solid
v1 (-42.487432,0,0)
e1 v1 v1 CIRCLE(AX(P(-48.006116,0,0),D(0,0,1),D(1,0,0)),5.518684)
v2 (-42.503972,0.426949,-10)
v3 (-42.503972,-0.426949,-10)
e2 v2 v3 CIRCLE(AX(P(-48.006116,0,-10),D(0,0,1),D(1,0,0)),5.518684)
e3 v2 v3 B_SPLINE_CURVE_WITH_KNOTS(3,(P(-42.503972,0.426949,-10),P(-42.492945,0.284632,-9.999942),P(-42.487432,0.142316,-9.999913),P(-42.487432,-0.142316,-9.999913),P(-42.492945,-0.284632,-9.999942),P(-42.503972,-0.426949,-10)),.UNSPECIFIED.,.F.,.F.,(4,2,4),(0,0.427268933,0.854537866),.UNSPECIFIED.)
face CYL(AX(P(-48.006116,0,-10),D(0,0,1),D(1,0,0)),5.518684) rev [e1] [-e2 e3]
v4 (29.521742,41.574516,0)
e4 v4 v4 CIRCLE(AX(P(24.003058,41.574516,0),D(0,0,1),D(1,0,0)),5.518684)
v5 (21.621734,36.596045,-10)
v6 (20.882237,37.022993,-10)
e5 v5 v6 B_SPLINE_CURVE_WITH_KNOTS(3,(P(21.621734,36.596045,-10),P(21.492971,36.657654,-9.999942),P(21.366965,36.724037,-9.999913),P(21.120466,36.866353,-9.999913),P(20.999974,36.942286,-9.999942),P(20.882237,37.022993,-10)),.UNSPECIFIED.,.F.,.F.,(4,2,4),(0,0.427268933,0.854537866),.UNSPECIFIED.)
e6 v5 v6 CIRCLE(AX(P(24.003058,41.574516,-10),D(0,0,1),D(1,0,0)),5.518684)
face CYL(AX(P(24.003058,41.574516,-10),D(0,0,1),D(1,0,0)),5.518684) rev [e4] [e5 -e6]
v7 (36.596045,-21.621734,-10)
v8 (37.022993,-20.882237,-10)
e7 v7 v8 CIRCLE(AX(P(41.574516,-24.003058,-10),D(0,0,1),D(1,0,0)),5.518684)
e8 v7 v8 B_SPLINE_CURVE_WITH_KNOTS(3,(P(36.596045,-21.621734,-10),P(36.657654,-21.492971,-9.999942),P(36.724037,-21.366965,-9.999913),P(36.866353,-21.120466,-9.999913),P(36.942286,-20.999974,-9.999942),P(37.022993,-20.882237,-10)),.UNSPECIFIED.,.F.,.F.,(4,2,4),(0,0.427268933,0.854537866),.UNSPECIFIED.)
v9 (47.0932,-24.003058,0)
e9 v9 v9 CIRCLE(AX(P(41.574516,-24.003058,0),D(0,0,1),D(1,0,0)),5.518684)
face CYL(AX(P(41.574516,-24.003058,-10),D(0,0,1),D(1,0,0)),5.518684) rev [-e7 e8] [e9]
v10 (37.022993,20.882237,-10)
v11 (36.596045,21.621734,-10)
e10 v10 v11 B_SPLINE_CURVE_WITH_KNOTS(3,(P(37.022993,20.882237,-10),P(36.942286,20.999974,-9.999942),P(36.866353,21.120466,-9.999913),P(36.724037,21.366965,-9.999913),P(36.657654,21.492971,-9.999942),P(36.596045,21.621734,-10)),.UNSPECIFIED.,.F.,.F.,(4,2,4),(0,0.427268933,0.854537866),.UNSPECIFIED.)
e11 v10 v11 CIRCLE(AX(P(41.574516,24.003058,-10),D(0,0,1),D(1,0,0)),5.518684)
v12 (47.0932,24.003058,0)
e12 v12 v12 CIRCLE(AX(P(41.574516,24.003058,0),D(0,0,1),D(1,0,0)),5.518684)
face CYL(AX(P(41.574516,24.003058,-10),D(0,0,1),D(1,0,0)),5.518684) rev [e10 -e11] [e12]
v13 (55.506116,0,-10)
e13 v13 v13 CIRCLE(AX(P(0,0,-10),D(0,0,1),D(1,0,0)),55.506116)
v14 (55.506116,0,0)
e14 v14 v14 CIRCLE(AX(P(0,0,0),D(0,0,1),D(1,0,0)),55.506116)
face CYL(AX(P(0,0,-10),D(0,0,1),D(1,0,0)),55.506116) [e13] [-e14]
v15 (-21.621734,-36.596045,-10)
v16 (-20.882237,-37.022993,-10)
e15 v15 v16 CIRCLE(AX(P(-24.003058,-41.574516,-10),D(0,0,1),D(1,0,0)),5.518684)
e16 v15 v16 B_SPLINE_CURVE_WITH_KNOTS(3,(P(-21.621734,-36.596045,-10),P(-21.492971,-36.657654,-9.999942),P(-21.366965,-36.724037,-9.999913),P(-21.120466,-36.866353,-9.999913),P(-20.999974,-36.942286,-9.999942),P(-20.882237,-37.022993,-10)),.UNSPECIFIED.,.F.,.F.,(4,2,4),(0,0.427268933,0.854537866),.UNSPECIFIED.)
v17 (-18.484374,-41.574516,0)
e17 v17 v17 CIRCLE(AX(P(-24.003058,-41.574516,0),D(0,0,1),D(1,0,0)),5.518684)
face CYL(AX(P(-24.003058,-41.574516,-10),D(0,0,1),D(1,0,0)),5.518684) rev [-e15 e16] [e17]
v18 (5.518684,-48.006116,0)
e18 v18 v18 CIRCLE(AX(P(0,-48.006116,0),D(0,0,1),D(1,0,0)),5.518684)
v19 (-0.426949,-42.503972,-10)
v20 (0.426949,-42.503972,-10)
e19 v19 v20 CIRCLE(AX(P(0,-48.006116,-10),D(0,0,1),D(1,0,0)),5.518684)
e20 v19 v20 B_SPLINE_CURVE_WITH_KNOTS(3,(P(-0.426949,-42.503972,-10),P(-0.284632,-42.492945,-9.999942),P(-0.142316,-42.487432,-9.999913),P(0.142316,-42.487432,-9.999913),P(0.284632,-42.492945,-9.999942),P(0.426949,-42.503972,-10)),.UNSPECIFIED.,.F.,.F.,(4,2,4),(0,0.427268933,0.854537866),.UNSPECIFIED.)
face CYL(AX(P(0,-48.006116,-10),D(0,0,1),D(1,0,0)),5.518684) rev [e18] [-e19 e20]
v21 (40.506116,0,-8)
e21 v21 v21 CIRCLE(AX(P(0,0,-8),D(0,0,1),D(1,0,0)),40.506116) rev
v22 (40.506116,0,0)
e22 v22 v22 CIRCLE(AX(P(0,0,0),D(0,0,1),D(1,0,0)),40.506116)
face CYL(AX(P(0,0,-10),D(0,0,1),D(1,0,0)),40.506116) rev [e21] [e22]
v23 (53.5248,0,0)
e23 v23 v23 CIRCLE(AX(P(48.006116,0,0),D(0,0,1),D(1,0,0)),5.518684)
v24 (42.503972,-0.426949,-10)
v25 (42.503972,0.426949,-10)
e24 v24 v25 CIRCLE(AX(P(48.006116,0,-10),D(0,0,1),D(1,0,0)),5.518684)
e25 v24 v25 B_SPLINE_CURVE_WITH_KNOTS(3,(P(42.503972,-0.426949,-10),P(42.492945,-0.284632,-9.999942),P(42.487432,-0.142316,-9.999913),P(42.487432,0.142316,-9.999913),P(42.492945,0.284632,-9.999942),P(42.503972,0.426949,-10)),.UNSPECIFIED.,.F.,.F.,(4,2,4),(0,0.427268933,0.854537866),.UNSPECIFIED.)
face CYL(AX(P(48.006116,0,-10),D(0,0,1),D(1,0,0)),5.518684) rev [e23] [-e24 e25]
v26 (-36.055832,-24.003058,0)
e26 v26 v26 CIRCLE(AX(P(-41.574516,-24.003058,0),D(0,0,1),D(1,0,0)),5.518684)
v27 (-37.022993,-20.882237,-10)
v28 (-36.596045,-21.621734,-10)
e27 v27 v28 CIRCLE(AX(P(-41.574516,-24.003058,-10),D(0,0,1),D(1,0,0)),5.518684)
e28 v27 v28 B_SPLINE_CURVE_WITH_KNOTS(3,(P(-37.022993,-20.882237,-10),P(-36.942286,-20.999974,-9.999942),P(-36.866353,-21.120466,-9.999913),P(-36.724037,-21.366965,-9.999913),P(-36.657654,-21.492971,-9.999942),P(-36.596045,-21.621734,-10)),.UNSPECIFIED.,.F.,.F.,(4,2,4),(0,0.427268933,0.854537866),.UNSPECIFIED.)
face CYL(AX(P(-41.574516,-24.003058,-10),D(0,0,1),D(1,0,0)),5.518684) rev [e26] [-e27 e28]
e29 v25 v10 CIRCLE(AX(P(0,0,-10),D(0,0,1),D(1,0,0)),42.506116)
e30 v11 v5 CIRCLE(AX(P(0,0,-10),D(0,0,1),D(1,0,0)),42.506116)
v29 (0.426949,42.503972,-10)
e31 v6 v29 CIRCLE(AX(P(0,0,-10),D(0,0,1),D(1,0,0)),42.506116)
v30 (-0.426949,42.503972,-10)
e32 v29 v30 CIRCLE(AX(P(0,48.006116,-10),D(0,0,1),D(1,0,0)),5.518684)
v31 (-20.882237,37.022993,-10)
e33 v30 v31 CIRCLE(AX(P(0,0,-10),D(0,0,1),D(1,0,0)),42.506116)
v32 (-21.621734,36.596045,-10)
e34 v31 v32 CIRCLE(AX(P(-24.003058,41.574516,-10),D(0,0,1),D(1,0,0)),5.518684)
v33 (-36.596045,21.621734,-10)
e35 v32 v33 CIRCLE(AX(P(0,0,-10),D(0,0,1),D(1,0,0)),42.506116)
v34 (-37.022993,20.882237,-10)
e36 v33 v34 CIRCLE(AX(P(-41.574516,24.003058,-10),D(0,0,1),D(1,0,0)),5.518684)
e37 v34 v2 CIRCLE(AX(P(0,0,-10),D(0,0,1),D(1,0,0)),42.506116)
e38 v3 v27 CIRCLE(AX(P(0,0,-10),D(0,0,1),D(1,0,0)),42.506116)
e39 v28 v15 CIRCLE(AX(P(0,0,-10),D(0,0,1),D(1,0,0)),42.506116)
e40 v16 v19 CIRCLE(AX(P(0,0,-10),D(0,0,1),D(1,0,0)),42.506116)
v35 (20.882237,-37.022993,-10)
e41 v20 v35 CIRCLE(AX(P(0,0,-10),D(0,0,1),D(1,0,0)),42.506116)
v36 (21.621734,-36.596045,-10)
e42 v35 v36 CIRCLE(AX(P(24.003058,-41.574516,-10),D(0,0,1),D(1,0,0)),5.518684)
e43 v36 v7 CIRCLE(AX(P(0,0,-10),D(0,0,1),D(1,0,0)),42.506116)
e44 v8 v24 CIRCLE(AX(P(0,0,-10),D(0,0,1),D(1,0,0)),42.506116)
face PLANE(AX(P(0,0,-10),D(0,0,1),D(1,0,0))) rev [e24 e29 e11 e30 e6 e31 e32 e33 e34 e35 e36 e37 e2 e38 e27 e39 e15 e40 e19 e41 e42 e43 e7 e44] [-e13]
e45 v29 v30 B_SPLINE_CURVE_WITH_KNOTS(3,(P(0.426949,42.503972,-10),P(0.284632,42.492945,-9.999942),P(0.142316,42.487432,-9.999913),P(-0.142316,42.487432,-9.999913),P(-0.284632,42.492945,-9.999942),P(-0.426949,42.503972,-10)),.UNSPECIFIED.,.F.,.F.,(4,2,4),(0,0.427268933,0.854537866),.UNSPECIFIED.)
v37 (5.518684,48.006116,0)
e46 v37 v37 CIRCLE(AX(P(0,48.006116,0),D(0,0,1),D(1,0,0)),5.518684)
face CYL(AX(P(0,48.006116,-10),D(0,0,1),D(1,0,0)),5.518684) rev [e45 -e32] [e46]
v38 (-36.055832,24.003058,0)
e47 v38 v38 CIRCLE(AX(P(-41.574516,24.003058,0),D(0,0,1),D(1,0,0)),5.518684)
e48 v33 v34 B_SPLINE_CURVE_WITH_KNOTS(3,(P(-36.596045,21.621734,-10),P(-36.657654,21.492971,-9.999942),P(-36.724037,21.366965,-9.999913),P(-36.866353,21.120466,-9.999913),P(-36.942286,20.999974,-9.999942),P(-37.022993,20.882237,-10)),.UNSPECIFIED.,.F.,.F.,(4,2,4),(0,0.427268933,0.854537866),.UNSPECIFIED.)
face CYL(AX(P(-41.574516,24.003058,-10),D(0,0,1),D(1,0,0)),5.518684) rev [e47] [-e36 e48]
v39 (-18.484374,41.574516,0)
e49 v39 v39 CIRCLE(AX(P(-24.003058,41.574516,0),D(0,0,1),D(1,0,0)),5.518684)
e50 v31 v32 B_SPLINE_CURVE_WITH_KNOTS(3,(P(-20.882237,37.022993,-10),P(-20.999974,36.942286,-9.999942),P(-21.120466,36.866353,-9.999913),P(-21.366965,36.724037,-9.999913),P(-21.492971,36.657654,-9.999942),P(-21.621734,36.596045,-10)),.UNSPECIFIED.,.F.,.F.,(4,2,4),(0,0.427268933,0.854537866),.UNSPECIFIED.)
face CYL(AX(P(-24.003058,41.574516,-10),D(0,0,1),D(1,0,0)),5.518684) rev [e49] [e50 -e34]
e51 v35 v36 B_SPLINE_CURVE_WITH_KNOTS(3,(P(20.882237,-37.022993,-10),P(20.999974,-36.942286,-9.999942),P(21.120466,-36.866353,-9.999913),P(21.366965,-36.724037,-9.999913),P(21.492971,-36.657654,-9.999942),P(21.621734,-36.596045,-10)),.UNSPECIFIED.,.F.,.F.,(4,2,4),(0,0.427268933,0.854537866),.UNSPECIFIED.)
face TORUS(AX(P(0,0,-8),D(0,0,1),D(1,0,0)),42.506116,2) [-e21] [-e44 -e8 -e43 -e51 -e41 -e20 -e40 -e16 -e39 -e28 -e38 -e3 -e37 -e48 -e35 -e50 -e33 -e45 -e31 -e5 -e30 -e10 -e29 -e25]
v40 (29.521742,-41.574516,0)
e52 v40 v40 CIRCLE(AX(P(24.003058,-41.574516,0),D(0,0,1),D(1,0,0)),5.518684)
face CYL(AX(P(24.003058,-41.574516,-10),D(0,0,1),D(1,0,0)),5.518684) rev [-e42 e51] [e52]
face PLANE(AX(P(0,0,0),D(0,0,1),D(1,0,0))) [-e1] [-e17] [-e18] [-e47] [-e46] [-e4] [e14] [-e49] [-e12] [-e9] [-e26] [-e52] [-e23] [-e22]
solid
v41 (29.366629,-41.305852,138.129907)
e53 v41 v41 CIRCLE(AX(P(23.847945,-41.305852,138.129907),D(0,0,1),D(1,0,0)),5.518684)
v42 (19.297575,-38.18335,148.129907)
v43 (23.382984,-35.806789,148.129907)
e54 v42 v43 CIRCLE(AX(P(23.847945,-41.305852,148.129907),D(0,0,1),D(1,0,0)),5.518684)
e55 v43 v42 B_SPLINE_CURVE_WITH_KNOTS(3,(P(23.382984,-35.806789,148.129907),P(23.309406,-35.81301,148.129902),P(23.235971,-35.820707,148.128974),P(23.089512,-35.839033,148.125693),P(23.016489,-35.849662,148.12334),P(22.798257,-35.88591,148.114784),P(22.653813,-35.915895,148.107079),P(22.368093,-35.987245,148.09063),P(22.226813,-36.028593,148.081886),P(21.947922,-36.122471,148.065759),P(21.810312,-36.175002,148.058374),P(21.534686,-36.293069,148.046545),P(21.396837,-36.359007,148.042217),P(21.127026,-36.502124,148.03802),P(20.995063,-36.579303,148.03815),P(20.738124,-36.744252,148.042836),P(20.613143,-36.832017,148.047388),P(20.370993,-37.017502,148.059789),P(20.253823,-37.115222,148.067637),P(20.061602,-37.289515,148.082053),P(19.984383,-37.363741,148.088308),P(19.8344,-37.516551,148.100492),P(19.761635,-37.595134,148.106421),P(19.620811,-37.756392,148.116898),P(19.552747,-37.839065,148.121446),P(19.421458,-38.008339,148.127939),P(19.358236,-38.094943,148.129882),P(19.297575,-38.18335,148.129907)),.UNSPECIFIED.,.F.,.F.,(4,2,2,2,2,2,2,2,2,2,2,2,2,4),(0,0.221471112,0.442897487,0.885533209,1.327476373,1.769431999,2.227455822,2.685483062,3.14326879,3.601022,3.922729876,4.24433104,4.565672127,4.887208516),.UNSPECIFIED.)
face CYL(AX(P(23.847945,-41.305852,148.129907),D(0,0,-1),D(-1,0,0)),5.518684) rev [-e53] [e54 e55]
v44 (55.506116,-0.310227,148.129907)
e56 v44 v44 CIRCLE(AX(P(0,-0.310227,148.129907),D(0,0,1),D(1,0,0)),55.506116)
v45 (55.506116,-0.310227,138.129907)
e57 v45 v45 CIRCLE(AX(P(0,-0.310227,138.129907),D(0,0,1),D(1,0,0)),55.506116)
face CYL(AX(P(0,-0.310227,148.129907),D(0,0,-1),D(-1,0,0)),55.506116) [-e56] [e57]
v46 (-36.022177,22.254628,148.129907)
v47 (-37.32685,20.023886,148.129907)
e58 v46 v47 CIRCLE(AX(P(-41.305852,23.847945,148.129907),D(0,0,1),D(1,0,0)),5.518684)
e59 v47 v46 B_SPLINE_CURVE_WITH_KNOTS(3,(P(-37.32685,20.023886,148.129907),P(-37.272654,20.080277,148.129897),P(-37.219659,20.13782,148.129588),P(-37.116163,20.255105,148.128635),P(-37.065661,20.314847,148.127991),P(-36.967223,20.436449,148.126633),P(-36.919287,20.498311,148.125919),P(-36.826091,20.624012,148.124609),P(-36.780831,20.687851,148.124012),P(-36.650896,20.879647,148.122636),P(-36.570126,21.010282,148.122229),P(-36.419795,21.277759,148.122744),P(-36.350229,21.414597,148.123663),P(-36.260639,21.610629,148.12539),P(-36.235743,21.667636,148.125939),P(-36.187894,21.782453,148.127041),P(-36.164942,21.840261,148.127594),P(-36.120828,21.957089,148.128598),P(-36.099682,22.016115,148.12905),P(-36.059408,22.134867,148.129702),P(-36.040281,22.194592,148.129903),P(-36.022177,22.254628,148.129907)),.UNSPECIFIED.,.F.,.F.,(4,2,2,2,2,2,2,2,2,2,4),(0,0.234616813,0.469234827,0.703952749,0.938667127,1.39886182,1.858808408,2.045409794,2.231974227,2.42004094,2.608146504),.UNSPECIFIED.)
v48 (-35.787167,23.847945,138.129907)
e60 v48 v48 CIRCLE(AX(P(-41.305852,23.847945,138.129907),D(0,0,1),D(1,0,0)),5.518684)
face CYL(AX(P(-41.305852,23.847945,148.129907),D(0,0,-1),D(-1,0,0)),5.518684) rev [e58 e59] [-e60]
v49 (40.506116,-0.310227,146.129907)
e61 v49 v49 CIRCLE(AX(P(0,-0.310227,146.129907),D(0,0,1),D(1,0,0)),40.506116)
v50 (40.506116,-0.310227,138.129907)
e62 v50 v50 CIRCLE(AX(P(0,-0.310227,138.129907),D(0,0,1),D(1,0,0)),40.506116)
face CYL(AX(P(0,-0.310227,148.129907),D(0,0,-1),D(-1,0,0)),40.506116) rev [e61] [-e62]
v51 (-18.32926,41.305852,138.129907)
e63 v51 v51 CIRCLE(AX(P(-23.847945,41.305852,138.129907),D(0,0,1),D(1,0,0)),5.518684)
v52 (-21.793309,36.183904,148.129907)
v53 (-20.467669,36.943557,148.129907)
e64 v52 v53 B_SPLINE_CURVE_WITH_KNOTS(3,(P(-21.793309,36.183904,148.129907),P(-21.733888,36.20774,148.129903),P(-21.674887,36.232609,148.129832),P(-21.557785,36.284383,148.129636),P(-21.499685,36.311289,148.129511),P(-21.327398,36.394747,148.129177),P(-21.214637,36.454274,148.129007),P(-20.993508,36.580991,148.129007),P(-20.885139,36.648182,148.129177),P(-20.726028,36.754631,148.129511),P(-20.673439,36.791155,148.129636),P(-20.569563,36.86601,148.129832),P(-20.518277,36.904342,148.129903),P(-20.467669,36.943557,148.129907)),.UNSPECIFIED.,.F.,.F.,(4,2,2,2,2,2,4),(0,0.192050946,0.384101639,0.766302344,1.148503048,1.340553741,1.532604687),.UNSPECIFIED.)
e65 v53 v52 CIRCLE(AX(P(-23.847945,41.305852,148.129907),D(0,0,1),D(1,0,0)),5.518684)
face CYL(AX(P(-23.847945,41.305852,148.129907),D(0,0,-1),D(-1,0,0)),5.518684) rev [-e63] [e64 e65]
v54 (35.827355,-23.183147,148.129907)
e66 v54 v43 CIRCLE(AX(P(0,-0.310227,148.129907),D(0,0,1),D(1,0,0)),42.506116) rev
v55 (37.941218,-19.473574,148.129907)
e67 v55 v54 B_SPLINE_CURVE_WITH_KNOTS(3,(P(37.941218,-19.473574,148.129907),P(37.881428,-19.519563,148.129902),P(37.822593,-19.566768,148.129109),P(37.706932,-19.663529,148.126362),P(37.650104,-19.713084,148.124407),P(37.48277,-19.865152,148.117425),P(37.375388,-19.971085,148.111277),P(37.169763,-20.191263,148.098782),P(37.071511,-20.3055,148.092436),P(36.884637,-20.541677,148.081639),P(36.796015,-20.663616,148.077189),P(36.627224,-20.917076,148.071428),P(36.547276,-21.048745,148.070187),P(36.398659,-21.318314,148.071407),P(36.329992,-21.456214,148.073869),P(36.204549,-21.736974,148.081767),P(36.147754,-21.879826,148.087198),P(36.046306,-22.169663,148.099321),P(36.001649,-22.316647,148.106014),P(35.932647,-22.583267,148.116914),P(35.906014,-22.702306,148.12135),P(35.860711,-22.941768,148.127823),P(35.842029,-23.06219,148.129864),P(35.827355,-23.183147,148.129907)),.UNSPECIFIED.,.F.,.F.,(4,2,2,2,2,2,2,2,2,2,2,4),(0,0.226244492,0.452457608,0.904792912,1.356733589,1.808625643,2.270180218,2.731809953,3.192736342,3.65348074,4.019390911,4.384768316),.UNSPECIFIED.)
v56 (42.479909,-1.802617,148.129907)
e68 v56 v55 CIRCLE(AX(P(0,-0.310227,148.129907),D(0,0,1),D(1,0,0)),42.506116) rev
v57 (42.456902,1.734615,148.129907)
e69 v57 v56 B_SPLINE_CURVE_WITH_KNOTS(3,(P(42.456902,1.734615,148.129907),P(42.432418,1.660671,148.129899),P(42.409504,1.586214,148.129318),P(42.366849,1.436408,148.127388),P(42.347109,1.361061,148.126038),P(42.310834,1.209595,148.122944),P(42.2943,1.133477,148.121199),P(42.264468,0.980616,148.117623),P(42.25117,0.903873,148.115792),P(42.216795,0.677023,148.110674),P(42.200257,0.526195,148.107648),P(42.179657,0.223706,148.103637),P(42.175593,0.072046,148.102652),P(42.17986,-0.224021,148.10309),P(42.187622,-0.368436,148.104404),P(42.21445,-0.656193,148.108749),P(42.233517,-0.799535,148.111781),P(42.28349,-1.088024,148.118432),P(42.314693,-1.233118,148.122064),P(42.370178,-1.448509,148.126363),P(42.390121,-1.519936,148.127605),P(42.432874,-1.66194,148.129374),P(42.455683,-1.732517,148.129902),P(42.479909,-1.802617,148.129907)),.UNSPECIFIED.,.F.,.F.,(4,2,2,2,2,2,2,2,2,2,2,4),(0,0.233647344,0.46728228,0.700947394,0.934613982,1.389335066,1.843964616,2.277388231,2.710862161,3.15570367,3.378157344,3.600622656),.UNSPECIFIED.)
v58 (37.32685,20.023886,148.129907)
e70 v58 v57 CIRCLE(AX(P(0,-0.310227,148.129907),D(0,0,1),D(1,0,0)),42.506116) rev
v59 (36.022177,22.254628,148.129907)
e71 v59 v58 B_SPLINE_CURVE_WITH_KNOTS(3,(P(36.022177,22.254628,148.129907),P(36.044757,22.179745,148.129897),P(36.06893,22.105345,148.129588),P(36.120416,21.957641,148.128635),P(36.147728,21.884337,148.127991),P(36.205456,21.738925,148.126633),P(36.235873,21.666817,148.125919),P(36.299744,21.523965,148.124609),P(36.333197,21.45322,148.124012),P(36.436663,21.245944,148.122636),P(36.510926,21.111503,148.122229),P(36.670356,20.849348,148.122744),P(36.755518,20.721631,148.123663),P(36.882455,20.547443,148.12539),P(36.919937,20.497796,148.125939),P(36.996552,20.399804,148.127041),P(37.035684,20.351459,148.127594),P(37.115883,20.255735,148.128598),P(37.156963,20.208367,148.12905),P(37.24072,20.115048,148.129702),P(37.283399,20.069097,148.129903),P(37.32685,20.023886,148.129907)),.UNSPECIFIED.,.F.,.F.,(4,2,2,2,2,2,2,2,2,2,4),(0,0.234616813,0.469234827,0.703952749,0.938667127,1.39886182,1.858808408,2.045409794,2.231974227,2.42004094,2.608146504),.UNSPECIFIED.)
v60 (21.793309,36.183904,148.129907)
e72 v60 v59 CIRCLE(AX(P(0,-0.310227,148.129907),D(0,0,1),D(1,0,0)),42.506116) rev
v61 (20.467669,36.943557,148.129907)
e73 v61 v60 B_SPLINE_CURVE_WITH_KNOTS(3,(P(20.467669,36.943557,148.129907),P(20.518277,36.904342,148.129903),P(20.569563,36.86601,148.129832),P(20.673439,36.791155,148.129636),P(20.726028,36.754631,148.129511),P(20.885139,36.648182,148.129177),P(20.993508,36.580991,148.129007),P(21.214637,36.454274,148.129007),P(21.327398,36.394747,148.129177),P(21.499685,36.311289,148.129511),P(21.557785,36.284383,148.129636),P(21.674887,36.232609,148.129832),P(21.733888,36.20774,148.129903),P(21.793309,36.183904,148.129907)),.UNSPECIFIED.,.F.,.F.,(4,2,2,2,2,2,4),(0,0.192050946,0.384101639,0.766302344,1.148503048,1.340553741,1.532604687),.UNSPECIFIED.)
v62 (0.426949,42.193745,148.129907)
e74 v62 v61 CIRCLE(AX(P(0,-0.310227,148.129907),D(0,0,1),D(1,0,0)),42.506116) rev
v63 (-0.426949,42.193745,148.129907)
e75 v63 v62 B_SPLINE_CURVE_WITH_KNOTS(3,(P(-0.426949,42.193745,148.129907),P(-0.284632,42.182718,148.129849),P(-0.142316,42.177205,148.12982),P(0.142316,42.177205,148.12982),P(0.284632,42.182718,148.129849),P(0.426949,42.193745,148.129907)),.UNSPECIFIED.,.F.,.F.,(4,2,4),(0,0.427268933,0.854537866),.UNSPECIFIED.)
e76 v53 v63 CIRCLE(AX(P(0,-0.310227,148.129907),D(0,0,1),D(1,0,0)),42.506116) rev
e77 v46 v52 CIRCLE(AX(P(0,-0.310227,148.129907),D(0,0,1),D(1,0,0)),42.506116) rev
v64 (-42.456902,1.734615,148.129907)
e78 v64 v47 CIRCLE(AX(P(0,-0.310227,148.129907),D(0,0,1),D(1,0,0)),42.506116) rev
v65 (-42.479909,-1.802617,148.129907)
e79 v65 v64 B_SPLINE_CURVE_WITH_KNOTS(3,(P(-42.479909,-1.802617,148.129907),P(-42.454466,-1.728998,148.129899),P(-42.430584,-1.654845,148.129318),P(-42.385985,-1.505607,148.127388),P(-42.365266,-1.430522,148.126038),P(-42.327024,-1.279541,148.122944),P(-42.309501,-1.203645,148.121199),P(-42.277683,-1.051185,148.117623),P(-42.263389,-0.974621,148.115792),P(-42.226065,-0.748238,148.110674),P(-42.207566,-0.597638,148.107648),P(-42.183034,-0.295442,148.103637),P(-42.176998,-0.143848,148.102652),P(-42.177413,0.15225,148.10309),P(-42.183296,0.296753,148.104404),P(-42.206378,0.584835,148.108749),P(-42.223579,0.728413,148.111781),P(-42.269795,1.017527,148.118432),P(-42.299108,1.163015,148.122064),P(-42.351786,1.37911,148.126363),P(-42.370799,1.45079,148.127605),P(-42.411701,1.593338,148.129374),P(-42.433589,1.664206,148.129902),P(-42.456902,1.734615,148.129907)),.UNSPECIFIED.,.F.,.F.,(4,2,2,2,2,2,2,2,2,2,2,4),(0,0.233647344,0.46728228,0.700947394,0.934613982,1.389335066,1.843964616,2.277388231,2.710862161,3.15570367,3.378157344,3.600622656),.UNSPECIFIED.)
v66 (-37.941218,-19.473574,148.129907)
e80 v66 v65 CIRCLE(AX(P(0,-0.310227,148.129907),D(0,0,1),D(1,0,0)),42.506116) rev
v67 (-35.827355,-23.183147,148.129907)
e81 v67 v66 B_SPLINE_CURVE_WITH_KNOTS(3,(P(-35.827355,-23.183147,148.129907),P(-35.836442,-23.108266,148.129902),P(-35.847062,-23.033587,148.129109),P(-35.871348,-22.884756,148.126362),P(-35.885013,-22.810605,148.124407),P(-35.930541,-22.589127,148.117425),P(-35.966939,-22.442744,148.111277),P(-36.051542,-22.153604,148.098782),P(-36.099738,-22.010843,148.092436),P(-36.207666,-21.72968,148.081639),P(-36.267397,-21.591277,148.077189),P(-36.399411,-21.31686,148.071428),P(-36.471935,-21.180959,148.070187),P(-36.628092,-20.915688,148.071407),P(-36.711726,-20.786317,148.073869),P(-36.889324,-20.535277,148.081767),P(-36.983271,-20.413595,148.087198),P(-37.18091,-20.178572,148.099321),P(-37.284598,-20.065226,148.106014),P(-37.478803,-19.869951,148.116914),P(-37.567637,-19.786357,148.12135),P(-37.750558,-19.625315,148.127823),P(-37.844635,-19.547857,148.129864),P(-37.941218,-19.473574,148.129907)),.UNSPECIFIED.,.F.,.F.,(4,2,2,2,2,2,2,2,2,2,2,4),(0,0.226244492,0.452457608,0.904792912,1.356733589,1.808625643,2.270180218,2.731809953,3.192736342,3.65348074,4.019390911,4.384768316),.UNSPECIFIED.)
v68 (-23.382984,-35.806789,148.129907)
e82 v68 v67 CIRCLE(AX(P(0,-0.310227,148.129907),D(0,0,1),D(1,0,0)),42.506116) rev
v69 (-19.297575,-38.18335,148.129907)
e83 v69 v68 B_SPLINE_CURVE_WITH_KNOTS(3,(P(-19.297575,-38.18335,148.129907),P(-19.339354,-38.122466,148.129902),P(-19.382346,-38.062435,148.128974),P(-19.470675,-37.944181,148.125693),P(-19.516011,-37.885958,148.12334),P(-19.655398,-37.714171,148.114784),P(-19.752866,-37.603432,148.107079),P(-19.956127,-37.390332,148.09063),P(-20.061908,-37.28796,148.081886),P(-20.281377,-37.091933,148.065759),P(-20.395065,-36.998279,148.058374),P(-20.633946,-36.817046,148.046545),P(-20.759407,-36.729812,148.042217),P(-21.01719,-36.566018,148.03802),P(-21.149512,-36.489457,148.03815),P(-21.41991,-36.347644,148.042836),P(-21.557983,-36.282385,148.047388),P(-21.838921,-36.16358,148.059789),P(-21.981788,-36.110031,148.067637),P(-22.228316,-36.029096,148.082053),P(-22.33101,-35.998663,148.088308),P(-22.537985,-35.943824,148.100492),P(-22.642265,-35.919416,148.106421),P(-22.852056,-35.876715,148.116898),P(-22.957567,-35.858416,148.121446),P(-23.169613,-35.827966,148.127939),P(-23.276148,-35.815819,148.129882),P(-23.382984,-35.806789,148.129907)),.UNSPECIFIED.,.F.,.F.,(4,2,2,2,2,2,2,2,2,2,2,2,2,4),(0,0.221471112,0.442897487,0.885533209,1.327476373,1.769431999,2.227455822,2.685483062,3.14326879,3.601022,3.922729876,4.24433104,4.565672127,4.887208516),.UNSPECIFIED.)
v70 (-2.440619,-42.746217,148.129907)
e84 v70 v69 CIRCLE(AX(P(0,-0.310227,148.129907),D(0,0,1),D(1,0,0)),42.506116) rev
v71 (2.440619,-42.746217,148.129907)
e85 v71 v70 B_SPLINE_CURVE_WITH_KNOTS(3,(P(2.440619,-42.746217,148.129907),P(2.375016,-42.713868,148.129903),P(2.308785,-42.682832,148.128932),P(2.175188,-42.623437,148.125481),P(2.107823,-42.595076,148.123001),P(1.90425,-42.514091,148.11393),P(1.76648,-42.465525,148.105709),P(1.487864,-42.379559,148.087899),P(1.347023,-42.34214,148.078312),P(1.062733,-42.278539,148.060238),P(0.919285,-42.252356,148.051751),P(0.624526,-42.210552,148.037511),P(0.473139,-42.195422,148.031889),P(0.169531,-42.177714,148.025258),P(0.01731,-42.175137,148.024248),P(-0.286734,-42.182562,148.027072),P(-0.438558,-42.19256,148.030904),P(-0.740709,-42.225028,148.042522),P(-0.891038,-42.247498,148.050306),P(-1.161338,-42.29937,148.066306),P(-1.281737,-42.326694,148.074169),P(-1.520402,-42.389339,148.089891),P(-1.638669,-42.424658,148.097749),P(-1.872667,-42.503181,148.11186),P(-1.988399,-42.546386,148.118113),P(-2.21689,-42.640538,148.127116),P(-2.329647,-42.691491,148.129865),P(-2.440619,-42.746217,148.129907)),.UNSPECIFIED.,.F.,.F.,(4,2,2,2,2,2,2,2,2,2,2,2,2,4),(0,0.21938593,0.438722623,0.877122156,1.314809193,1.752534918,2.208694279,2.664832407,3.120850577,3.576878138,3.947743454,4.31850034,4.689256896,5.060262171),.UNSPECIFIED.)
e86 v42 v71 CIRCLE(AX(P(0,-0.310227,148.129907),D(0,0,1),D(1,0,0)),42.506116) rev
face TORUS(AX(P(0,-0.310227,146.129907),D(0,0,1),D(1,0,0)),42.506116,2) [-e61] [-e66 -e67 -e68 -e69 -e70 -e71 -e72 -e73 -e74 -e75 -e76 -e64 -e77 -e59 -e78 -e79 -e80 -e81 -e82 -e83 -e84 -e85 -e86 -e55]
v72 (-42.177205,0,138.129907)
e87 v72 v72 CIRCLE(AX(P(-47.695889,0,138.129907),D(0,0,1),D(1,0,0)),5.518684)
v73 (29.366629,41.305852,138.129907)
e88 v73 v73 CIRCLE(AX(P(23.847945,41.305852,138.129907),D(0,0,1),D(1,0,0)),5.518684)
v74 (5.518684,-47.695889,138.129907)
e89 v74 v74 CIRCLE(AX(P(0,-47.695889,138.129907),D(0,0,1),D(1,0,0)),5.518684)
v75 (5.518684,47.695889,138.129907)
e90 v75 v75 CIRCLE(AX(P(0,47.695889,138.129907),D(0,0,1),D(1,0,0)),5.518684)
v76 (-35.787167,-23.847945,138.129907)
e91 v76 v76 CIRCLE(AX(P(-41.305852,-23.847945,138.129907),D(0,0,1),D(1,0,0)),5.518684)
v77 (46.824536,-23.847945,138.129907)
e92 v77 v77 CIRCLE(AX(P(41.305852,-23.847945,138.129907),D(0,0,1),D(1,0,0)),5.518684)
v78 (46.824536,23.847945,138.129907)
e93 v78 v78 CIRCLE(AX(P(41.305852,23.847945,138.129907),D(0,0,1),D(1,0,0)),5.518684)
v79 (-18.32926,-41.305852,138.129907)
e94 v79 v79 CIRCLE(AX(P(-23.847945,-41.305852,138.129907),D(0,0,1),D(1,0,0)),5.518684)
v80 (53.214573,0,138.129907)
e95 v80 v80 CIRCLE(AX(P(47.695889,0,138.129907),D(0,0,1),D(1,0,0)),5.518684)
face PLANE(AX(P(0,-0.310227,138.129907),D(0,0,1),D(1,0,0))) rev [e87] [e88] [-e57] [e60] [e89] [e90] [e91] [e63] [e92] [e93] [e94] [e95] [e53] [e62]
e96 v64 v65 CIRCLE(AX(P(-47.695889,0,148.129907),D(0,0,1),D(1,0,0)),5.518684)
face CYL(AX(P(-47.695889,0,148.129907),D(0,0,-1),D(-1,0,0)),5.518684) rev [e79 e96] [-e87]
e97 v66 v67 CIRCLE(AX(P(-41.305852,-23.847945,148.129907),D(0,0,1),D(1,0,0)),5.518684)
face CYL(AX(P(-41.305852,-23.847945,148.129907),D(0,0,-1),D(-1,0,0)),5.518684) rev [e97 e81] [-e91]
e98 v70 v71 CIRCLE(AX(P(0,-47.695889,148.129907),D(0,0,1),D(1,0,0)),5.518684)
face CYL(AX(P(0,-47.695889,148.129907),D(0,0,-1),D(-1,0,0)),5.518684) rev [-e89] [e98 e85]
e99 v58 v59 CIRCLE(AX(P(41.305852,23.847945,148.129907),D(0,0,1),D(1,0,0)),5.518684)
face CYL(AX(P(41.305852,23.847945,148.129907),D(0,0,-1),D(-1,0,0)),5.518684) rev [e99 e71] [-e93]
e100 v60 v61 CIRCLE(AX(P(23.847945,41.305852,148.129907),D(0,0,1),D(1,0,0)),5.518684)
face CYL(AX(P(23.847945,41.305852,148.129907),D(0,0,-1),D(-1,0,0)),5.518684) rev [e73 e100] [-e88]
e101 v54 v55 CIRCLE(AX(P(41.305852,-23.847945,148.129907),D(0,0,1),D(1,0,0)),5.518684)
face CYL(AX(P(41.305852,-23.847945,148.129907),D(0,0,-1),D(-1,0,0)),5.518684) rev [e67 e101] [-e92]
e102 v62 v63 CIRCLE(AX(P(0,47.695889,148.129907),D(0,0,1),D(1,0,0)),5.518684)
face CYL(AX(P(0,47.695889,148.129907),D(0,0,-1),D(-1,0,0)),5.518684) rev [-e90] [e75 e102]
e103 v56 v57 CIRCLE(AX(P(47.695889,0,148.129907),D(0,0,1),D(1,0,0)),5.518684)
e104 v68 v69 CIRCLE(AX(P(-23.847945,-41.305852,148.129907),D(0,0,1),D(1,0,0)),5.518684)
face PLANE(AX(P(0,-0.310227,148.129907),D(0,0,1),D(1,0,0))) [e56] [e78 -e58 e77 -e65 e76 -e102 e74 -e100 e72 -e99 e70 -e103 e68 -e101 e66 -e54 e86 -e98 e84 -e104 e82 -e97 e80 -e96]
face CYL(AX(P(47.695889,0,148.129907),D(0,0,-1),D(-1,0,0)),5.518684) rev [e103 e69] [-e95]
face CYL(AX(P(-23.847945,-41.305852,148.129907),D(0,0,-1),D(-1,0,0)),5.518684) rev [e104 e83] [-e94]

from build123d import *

# Parameters (mm, degrees)
SKETCH5_R           = 55.506115836
SKETCH5_R_2         = 40.506115836
SKETCH5_R_3         = 5.518684336
BOSS_EXTRUDE1_DEPTH = 10
SKETCH1_R           = 55.506115836
SKETCH1_R_2         = 40.506115836
SKETCH1_R_3         = 5.518684336
BOSS_EXTRUDE2_DEPTH = 10
FILLET1_R           = 2
FILLET4_R           = 2


with BuildPart() as part:
    # Sketch5 → Boss-Extrude1 (new body)
    with BuildSketch(Plane.XY.offset(138.12990696)):
        with Locations((0, -0.310226717)):
            Circle(SKETCH5_R)
        with Locations((0, -0.310226717)):
            Circle(SKETCH5_R_2, mode=Mode.SUBTRACT)
        with Locations((0, 47.695889119)):
            Circle(SKETCH5_R_3, mode=Mode.SUBTRACT)
        with Locations((23.84794456, 41.305851633)):
            Circle(SKETCH5_R_3, mode=Mode.SUBTRACT)
        with Locations((41.305851633, 23.84794456)):
            Circle(SKETCH5_R_3, mode=Mode.SUBTRACT)
        with Locations((47.695889119, 0)):
            Circle(SKETCH5_R_3, mode=Mode.SUBTRACT)
        with Locations((41.305851633, -23.84794456)):
            Circle(SKETCH5_R_3, mode=Mode.SUBTRACT)
        with Locations((23.84794456, -41.305851633)):
            Circle(SKETCH5_R_3, mode=Mode.SUBTRACT)
        with Locations((0, -47.695889119)):
            Circle(SKETCH5_R_3, mode=Mode.SUBTRACT)
        with Locations((-23.84794456, -41.305851633)):
            Circle(SKETCH5_R_3, mode=Mode.SUBTRACT)
        with Locations((-41.305851633, -23.84794456)):
            Circle(SKETCH5_R_3, mode=Mode.SUBTRACT)
        with Locations((-47.695889119, 0)):
            Circle(SKETCH5_R_3, mode=Mode.SUBTRACT)
        with Locations((-41.305851633, 23.84794456)):
            Circle(SKETCH5_R_3, mode=Mode.SUBTRACT)
        with Locations((-23.84794456, 41.305851633)):
            Circle(SKETCH5_R_3, mode=Mode.SUBTRACT)
    extrude(amount=BOSS_EXTRUDE1_DEPTH)

    # Fillet1
    # the kernel refuses this fillet: 2 mm, written as the material it takes off along each edge
    with BuildSketch(Plane(origin=(0, -0.310226717, 148.12990696), x_dir=(1, 0, 0), z_dir=(0, -1, 0))) as fillet1_piece_1:
        with BuildLine():
            CenterArc((40.506115836 + FILLET1_R, -FILLET1_R), FILLET1_R, 90, 90)
            Line((40.506115836 + FILLET1_R, 0), (40.506115836, 0))
            Line((40.506115836, 0), (40.506115836, -FILLET1_R))
        make_face()
    revolve(axis=Axis((0, -0.310226717, 148.12990696), (0, 0, 1)), mode=Mode.SUBTRACT)


with BuildPart() as body_2:
    # Sketch1 → Boss-Extrude2 (new body)
    with BuildSketch(Plane.XY):
        Circle(SKETCH1_R)
        Circle(SKETCH1_R_2, mode=Mode.SUBTRACT)
        with Locations((0, 48.006115836)):
            Circle(SKETCH1_R_3, mode=Mode.SUBTRACT)
        with Locations((24.003057918, 41.574515851)):
            Circle(SKETCH1_R_3, mode=Mode.SUBTRACT)
        with Locations((41.574515851, 24.003057918)):
            Circle(SKETCH1_R_3, mode=Mode.SUBTRACT)
        with Locations((48.006115836, 0)):
            Circle(SKETCH1_R_3, mode=Mode.SUBTRACT)
        with Locations((41.574515851, -24.003057918)):
            Circle(SKETCH1_R_3, mode=Mode.SUBTRACT)
        with Locations((24.003057918, -41.574515851)):
            Circle(SKETCH1_R_3, mode=Mode.SUBTRACT)
        with Locations((0, -48.006115836)):
            Circle(SKETCH1_R_3, mode=Mode.SUBTRACT)
        with Locations((-24.003057918, -41.574515851)):
            Circle(SKETCH1_R_3, mode=Mode.SUBTRACT)
        with Locations((-41.574515851, -24.003057918)):
            Circle(SKETCH1_R_3, mode=Mode.SUBTRACT)
        with Locations((-48.006115836, 0)):
            Circle(SKETCH1_R_3, mode=Mode.SUBTRACT)
        with Locations((-41.574515851, 24.003057918)):
            Circle(SKETCH1_R_3, mode=Mode.SUBTRACT)
        with Locations((-24.003057918, 41.574515851)):
            Circle(SKETCH1_R_3, mode=Mode.SUBTRACT)
    extrude(amount=-BOSS_EXTRUDE2_DEPTH)

    # Fillet4
    fillet4_edges = [body_2.edges().sort_by_distance(p)[0] for p in [
        (-40.506115836, 0, -10),
    ]]
    fillet(fillet4_edges, radius=FILLET4_R)


solid = Compound([part.part, body_2.part])
